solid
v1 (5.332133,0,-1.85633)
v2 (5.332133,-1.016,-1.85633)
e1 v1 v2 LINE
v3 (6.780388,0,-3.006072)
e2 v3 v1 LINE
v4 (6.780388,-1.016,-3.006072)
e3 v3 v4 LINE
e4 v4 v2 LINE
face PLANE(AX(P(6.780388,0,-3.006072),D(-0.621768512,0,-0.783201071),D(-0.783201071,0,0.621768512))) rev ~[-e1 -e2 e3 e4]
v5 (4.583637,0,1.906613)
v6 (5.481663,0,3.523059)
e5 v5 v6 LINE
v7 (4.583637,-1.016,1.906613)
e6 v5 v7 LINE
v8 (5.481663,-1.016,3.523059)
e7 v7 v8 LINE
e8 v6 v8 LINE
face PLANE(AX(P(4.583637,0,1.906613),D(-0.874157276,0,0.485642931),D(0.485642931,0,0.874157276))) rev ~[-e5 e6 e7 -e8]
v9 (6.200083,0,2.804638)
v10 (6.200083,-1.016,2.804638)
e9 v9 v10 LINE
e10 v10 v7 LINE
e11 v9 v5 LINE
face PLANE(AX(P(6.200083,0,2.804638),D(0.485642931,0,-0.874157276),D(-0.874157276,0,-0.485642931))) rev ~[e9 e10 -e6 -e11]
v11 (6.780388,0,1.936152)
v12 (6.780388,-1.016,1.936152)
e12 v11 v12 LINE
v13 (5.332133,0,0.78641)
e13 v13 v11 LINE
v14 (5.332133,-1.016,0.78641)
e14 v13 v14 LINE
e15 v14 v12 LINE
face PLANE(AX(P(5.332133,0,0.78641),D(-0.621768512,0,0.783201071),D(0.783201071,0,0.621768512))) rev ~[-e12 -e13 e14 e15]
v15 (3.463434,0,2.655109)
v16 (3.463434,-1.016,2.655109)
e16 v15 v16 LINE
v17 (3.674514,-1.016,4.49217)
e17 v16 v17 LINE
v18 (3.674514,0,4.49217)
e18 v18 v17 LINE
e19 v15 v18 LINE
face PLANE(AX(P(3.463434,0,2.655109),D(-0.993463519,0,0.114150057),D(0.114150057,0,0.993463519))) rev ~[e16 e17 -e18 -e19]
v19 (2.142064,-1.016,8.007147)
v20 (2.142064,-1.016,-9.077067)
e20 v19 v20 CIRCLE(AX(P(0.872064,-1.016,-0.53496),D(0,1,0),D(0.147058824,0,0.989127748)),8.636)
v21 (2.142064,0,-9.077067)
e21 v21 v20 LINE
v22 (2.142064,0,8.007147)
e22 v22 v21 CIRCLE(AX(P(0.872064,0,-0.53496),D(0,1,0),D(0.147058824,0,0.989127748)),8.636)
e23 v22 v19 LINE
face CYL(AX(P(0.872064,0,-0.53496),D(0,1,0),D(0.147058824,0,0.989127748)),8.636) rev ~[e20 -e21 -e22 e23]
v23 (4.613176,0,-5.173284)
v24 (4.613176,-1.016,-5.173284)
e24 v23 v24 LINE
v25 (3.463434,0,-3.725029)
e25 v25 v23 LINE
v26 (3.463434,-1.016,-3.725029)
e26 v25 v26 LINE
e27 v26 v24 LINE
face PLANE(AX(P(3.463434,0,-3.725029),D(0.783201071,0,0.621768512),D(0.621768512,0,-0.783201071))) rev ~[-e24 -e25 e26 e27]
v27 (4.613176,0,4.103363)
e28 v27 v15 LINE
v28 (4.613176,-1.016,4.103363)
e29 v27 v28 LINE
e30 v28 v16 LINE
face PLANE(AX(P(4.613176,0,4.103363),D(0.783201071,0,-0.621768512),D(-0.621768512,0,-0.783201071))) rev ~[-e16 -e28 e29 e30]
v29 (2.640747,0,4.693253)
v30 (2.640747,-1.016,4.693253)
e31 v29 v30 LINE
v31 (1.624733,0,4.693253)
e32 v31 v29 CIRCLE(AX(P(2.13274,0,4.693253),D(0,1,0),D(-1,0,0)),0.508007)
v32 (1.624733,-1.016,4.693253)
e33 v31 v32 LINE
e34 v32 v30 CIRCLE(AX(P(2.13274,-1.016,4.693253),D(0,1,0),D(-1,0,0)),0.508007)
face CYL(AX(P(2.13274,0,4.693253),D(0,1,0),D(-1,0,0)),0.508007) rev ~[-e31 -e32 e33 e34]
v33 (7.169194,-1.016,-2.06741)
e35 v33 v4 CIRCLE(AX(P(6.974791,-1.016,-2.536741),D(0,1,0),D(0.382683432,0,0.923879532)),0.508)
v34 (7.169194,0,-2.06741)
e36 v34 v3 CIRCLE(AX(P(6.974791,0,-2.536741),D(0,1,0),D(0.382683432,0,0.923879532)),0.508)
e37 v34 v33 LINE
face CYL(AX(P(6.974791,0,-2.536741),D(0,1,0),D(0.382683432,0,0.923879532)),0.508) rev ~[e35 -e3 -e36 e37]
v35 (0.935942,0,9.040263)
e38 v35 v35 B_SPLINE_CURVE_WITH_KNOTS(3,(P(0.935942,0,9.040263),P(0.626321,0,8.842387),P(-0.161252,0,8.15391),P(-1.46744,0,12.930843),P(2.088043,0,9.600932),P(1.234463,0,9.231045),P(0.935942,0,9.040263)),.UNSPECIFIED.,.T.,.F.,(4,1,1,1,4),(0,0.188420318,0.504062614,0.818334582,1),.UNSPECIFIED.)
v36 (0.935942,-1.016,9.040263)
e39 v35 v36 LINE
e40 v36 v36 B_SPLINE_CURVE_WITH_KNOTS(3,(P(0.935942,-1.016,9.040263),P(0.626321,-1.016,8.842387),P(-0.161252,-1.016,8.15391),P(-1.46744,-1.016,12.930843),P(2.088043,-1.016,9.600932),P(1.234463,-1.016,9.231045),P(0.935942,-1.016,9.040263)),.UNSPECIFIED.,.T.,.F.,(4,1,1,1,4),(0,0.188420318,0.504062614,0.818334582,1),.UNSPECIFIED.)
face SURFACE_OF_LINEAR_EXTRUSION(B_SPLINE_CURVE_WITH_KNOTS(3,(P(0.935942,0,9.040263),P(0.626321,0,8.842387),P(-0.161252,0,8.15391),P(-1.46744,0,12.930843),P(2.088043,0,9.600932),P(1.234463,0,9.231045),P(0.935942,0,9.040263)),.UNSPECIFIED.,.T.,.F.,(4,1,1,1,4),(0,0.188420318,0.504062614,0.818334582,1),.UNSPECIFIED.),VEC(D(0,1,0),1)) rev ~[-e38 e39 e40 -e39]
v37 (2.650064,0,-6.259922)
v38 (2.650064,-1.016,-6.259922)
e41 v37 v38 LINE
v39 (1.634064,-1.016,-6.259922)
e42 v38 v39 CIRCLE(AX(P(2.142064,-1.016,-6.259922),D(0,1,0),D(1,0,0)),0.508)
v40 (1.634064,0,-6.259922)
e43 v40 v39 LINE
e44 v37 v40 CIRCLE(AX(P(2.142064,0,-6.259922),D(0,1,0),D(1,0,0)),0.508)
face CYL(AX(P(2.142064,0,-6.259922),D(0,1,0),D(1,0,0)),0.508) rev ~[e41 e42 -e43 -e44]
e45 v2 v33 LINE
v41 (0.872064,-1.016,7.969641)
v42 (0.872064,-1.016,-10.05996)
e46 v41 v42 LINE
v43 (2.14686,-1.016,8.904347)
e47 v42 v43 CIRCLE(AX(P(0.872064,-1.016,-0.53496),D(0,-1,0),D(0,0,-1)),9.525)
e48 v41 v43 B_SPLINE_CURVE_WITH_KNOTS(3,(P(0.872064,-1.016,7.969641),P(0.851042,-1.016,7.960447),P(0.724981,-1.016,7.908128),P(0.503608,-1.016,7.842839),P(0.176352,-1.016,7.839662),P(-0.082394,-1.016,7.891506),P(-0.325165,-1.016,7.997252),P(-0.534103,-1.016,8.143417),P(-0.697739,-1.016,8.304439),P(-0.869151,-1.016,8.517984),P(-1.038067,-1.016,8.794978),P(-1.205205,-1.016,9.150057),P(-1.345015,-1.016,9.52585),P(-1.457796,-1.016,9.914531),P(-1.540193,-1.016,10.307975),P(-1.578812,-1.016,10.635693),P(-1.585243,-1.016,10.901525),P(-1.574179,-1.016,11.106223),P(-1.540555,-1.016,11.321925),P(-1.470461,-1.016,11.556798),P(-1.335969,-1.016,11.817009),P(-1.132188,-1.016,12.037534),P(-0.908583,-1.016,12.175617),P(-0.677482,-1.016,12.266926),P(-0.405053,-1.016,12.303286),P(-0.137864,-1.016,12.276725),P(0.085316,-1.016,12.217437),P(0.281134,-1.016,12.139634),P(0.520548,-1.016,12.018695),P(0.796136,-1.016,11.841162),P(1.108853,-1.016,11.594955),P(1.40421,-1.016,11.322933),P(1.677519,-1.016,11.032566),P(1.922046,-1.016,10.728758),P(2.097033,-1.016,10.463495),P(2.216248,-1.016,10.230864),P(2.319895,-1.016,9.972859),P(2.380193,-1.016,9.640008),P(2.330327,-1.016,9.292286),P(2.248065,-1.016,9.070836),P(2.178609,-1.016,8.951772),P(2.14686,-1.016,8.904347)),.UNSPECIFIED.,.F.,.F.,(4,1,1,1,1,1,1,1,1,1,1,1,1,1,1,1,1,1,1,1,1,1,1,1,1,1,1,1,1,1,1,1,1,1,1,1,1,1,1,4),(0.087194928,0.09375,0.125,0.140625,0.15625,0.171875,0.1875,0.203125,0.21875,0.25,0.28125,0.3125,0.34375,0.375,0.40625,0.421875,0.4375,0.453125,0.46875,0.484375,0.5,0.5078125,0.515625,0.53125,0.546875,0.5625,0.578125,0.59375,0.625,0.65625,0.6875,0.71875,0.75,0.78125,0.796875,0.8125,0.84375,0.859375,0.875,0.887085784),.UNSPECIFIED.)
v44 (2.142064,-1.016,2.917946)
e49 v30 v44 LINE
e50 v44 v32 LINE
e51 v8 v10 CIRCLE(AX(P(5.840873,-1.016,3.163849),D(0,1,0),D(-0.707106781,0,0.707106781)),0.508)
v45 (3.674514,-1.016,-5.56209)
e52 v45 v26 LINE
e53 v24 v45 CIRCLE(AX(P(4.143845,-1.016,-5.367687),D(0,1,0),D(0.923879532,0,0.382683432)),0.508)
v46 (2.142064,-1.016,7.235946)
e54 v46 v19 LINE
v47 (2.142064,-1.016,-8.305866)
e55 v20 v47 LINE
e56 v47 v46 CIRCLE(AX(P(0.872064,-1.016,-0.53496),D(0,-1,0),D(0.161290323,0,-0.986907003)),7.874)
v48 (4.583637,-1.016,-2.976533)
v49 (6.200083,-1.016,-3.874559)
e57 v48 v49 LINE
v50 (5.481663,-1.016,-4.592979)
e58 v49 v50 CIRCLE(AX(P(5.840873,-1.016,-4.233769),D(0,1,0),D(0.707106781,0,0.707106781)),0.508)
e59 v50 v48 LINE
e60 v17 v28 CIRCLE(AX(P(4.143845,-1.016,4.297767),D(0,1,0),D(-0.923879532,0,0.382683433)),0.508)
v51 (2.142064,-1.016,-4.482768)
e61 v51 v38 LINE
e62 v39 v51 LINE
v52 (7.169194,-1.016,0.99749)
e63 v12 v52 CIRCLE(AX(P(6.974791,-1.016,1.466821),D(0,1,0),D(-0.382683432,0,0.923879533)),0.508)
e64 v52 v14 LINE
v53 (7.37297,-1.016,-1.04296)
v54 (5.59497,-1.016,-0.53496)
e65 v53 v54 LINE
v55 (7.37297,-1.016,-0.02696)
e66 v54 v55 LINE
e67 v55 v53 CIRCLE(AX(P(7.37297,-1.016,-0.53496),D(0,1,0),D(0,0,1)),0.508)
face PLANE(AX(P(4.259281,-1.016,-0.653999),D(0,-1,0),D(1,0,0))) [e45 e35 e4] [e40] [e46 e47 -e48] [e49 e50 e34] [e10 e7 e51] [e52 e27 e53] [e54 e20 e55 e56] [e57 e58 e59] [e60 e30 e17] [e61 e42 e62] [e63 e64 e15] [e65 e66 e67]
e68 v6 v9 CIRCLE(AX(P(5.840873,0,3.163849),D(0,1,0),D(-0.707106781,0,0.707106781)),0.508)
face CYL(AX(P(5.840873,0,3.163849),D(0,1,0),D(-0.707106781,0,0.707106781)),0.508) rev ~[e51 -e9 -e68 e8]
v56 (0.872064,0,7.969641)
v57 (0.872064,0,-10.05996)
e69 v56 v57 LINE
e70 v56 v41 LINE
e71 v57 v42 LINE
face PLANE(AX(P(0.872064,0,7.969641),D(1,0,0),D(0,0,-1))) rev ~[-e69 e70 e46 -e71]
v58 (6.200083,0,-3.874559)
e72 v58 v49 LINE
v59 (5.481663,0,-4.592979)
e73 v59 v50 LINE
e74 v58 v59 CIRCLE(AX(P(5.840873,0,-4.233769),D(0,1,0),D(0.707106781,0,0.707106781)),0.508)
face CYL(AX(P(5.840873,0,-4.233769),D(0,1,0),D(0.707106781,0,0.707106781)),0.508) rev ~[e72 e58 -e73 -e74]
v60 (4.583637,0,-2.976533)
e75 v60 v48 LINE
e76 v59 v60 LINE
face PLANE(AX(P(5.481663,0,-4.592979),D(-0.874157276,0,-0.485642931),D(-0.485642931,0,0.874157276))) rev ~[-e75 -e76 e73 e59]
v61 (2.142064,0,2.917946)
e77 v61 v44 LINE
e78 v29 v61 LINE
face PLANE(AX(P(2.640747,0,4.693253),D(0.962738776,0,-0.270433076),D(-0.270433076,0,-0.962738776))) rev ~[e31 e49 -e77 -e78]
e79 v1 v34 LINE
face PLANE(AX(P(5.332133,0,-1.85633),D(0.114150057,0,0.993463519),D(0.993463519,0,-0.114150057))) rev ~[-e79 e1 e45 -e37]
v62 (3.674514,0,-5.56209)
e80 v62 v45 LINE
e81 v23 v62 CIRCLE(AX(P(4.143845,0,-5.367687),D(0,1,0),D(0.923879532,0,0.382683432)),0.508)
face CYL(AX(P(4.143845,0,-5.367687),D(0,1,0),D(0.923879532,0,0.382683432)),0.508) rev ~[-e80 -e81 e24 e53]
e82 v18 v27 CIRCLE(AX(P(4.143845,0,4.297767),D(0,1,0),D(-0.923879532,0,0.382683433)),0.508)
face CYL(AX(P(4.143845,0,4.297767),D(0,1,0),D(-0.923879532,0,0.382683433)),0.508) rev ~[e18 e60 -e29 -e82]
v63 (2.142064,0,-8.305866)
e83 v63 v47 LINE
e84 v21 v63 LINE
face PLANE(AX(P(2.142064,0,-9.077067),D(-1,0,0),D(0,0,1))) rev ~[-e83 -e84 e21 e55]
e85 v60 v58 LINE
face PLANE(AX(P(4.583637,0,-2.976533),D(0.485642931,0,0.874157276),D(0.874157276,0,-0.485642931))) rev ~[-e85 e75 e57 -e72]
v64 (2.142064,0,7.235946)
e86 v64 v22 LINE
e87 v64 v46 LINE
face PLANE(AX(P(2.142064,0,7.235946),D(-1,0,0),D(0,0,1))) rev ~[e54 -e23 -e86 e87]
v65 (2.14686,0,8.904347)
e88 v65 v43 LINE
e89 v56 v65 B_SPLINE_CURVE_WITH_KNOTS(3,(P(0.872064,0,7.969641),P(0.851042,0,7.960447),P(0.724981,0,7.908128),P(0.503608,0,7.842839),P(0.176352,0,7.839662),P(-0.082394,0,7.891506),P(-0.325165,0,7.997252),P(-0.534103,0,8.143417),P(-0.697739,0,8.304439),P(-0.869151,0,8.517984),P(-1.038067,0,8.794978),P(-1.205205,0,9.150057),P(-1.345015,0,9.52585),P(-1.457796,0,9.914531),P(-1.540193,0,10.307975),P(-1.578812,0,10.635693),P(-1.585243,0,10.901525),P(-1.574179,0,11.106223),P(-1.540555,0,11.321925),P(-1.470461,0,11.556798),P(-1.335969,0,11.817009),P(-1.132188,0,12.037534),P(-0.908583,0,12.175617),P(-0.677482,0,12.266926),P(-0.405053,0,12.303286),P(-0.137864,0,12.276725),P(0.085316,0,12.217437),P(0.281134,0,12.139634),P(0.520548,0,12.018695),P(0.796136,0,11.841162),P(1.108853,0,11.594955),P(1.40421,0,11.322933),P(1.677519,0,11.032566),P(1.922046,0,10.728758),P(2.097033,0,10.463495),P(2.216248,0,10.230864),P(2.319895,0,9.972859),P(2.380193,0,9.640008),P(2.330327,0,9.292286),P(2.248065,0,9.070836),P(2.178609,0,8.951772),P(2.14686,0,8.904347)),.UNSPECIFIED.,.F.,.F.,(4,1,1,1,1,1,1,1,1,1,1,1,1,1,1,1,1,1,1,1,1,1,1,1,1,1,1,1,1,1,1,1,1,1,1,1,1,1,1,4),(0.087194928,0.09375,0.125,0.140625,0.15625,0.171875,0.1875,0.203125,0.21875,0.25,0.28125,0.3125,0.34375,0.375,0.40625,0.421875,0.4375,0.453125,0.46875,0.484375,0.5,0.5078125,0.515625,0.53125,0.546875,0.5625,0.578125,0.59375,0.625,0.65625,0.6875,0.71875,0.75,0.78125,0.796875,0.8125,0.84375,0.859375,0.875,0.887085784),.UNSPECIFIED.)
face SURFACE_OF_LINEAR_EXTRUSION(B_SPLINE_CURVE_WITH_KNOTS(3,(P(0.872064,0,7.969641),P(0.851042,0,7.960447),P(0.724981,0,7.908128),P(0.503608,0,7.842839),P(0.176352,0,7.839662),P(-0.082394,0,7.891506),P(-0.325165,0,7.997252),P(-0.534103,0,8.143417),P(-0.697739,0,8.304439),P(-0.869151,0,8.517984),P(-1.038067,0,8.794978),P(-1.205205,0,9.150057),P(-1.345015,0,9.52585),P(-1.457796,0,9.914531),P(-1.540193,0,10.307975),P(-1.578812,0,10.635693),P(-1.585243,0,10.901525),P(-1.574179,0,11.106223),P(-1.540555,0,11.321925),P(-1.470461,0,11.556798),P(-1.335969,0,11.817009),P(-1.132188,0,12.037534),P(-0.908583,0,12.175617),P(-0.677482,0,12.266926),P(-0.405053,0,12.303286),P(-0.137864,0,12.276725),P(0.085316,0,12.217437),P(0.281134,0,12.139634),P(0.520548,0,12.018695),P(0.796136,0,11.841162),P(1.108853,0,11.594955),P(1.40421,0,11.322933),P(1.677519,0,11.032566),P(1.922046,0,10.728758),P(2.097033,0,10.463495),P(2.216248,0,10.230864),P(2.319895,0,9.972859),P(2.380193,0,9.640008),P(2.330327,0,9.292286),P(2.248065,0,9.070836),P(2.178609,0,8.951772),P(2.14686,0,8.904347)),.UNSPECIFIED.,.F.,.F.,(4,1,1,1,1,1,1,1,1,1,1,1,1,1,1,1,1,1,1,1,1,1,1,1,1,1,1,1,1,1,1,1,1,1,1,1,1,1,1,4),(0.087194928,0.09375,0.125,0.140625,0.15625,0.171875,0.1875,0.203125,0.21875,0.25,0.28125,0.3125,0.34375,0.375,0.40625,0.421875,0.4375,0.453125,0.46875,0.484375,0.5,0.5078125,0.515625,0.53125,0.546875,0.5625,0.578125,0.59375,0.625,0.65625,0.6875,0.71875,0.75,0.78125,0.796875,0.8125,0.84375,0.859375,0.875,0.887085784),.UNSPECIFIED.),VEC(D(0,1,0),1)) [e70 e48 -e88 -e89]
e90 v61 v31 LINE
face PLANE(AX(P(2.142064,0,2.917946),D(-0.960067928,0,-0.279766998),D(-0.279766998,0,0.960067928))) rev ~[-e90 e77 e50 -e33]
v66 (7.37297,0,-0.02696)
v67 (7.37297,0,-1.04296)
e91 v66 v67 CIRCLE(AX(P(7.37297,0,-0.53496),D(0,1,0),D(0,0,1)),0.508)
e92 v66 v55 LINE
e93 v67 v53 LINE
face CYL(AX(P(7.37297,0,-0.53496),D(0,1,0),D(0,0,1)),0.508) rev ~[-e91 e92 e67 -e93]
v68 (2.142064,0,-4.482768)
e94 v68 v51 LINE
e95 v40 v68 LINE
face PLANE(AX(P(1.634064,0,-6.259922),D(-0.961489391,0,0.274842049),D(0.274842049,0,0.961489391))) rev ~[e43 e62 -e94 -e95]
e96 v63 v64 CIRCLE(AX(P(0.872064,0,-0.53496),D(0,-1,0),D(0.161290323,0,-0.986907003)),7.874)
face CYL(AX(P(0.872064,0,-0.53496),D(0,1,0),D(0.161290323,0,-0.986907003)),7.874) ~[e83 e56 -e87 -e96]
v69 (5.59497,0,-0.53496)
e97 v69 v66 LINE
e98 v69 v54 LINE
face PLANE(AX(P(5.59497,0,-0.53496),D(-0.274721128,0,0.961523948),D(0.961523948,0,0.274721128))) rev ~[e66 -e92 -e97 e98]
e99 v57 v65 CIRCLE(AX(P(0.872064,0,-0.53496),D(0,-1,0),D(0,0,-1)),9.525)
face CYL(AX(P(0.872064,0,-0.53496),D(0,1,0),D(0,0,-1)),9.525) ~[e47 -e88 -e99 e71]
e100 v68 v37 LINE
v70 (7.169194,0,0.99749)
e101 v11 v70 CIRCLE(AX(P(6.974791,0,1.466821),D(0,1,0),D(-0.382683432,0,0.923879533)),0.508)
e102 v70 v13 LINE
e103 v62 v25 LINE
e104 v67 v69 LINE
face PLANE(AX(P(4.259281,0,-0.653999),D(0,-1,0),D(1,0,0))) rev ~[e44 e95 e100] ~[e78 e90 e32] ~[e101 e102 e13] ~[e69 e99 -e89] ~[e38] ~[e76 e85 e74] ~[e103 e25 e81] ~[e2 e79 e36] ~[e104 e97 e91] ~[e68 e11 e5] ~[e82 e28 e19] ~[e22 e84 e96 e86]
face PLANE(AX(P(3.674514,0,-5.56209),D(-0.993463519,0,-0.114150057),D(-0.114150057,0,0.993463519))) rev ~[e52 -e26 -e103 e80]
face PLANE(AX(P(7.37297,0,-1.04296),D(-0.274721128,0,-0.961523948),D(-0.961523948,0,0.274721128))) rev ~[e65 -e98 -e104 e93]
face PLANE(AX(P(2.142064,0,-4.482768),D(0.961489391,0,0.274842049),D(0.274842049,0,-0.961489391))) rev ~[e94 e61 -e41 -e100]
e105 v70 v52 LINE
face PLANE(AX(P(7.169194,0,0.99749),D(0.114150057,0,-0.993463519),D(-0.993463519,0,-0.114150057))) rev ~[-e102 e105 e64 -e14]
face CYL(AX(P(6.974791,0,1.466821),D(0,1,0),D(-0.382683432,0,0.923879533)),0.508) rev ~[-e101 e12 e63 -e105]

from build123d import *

# Parameters (mm, degrees)
F1_DEPTH = 1.016


# Not quite as in the source:
# - the dataset's text gives a spline's control points without its knots; the knots are read off the source's solid
# - a feature names something its author has since deleted; it is built from what else it names


with BuildPart() as f1:
    # F0 (on Front) → F1 (new body)
    with BuildSketch(Plane.XZ):
        with BuildLine():
            Line((0.8720639816, 7.9696412083), (0.8720639816, -10.0599602319))
            ThreePointArc((0.8720639816, -10.0599602319), (10.3756166469, -1.17379647), (2.1468595371, 8.9043470145))
            add(Edge.make_bspline(
                [(2.1468595371, 8.9043470145), (2.1375619429, 8.8904589251), (2.0865405168, 8.8173483885), (1.9460704833, 8.6552218776), (1.7420457163, 8.4951357663), (1.5810849761, 8.3938358775), (1.4761600351, 8.3297187682), (1.4351295268, 8.3042443679), (1.4146787791, 8.2911748332)],
                knots=[0.8870857839, 0.8870857839, 0.8870857839, 0.8870857839, 0.890625, 0.90625, 0.9375, 0.96875, 0.984375, 1, 1, 1, 1], degree=3))
            add(Edge.make_bspline(
                [(1.4146787791, 8.2911748332), (1.3942280315, 8.2781052984), (1.3534555492, 8.2513015595), (1.2501088251, 8.1821845952), (1.1037829859, 8.0867078461), (0.9512588202, 8.0042801492), (0.8720639816, 7.9696412083)],
                knots=[0, 0, 0, 0, 0.015625, 0.03125, 0.0625, 0.0871949279, 0.0871949279, 0.0871949279, 0.0871949279], degree=3))
        make_face()
        with BuildLine():
            Line((2.1420639816, -4.4827677338), (2.6500639816, -6.2599216028))
            ThreePointArc((2.6500639816, -6.2599216028), (2.1420639816, -6.7679216028), (1.6340639816, -6.2599216028))
            Line((1.6340639816, -6.2599216028), (2.1420639816, -4.4827677338))
        make_face(mode=Mode.SUBTRACT)
        with BuildLine():
            Line((3.4634338013, -3.7250291716), (4.6131757466, -5.1732837967))
            ThreePointArc((4.6131757466, -5.1732837967), (4.3382481277, -5.8370177829), (3.6745141416, -5.562090164))
            Line((3.6745141416, -5.562090164), (3.4634338013, -3.7250291716))
        make_face(mode=Mode.SUBTRACT)
        with BuildLine():
            Line((4.5836370443, -2.9765332945), (6.2000831461, -3.8745589066))
            ThreePointArc((6.2000831461, -3.8745589066), (6.2000831461, -4.5929793963), (5.4816626564, -4.5929793963))
            Line((5.4816626564, -4.5929793963), (4.5836370443, -2.9765332945))
        make_face(mode=Mode.SUBTRACT)
        with BuildLine():
            Line((5.3321329213, -1.8563300516), (7.1691939138, -2.0674103918))
            ThreePointArc((7.1691939138, -2.0674103918), (7.4441215326, -2.731144378), (6.7803875465, -3.0060719968))
            Line((6.7803875465, -3.0060719968), (5.3321329213, -1.8563300516))
        make_face(mode=Mode.SUBTRACT)
        with BuildLine():
            ThreePointArc((2.1420639816, 8.0071470023), (9.5080639816, -0.5349602319), (2.1420639816, -9.077067466))
            Line((2.1420639816, -9.077067466), (2.1420639816, -8.3058659706))
            ThreePointArc((2.1420639816, -8.3058659706), (8.7460639816, -0.5349602319), (2.1420639816, 7.2359455069))
            Line((2.1420639816, 7.2359455069), (2.1420639816, 8.0071470023))
        make_face(mode=Mode.SUBTRACT)
        with BuildLine():
            Line((5.5949697203, -0.5349602319), (7.3729697203, -0.0269602319))
            ThreePointArc((7.3729697203, -0.0269602319), (7.8809697203, -0.5349602319), (7.3729697203, -1.0429602319))
            Line((7.3729697203, -1.0429602319), (5.5949697203, -0.5349602319))
        make_face(mode=Mode.SUBTRACT)
        with BuildLine():
            Line((5.3321329213, 0.7864095879), (6.7803875465, 1.9361515331))
            ThreePointArc((6.7803875465, 1.9361515331), (7.4441215326, 1.6612239143), (7.1691939138, 0.9974899281))
            Line((7.1691939138, 0.9974899281), (5.3321329213, 0.7864095879))
        make_face(mode=Mode.SUBTRACT)
        with BuildLine():
            Line((2.1420639816, 2.9179455069), (1.6247334216, 4.6932531117))
            ThreePointArc((1.6247334216, 4.6932531117), (2.1327404272, 5.2012601173), (2.6407474328, 4.6932531117))
            Line((2.6407474328, 4.6932531117), (2.1420639816, 2.9179455069))
        make_face(mode=Mode.SUBTRACT)
        with BuildLine():
            Line((3.4634338013, 2.6551087078), (3.6745141416, 4.4921697003))
            ThreePointArc((3.6745141416, 4.4921697003), (4.3382481277, 4.7670973191), (4.6131757466, 4.103363333))
            Line((4.6131757466, 4.103363333), (3.4634338013, 2.6551087078))
        make_face(mode=Mode.SUBTRACT)
        with BuildLine():
            Line((4.5836370443, 1.9066128308), (5.4816626564, 3.5230589326))
            ThreePointArc((5.4816626564, 3.5230589326), (6.200083146, 3.5230589326), (6.2000831461, 2.8046384429))
            Line((6.2000831461, 2.8046384429), (4.5836370443, 1.9066128308))
        make_face(mode=Mode.SUBTRACT)
        with BuildLine():
            add(Edge.make_bspline(
                [(2.1468595371, 8.9043470145), (2.1375619429, 8.8904589251), (2.0865405168, 8.8173483885), (1.9460704833, 8.6552218776), (1.7420457163, 8.4951357663), (1.5810849761, 8.3938358775), (1.4761600351, 8.3297187682), (1.4351295268, 8.3042443679), (1.4146787791, 8.2911748332)],
                knots=[0.8870857839, 0.8870857839, 0.8870857839, 0.8870857839, 0.890625, 0.90625, 0.9375, 0.96875, 0.984375, 1, 1, 1, 1], degree=3))
            ThreePointArc((2.1468595371, 8.9043470145), (1.5109002197, 8.9685924334), (0.8720639816, 8.9900397681))
            Line((0.8720639816, 8.9900397681), (0.8720639816, 7.9696412083))
            add(Edge.make_bspline(
                [(1.4146787791, 8.2911748332), (1.3942280315, 8.2781052984), (1.3534555492, 8.2513015595), (1.2501088251, 8.1821845952), (1.1037829859, 8.0867078461), (0.9512588202, 8.0042801492), (0.8720639816, 7.9696412083)],
                knots=[0, 0, 0, 0, 0.015625, 0.03125, 0.0625, 0.0871949279, 0.0871949279, 0.0871949279, 0.0871949279], degree=3))
        make_face()
        with BuildLine():
            ThreePointArc((0.8720639816, 8.9900397681), (1.5109002197, 8.9685924334), (2.1468595371, 8.9043470145))
            add(Edge.make_bspline(
                [(0.8720639816, 7.9696412083), (0.8510423418, 7.960446577), (0.7249813726, 7.9081278301), (0.5036077396, 7.8428386533), (0.1763517707, 7.8396617002), (-0.0823939536, 7.8915061916), (-0.3251654939, 7.9972515694), (-0.5341027476, 8.1434171752), (-0.697739214, 8.3044391135), (-0.8691513012, 8.5179837512), (-1.0380674288, 8.7949781885), (-1.2052049627, 9.1500571037), (-1.3450151386, 9.5258501154), (-1.4577963792, 9.9145311538), (-1.5401925336, 10.3079754275), (-1.5788115991, 10.635693281), (-1.5852425405, 10.9015252067), (-1.5741785001, 11.1062228204), (-1.5405553236, 11.3219253664), (-1.4704609064, 11.5567984789), (-1.33596904, 11.8170093575), (-1.1321876014, 12.0375341588), (-0.908583488, 12.1756170372), (-0.6774819455, 12.2669258051), (-0.4050529119, 12.3032860953), (-0.1378640903, 12.2767253775), (0.0853156063, 12.2174366098), (0.2811335851, 12.13963355), (0.5205476797, 12.0186949927), (0.7961357942, 11.8411620626), (1.1088534794, 11.5949546296), (1.4042104843, 11.3229328113), (1.6775187355, 11.0325659825), (1.9220461866, 10.7287576582), (2.0970325204, 10.463495283), (2.216248269, 10.2308639089), (2.3198947054, 9.9728588144), (2.3801931706, 9.6400082363), (2.3303267053, 9.292286109), (2.248064936, 9.0708356121), (2.1786091427, 8.9517723325), (2.1468595371, 8.9043470145)],
                knots=[0.0871949279, 0.0871949279, 0.0871949279, 0.0871949279, 0.09375, 0.125, 0.140625, 0.15625, 0.171875, 0.1875, 0.203125, 0.21875, 0.25, 0.28125, 0.3125, 0.34375, 0.375, 0.40625, 0.421875, 0.4375, 0.453125, 0.46875, 0.484375, 0.5, 0.5078125, 0.515625, 0.53125, 0.546875, 0.5625, 0.578125, 0.59375, 0.625, 0.65625, 0.6875, 0.71875, 0.75, 0.78125, 0.796875, 0.8125, 0.84375, 0.859375, 0.875, 0.8870857839, 0.8870857839, 0.8870857839, 0.8870857839], degree=3))
            Line((0.8720639816, 7.9696412083), (0.8720639816, 8.9900397681))
        make_face()
        with BuildLine():
            add(Edge.make_bspline(
                [(0.9359423365, 9.0402629925), (0.6263213587, 8.8423866229), (-0.161252366, 8.1539099286), (-1.4674404396, 12.930843348), (2.0880429138, 9.6009320246), (1.23446335, 9.2310454608), (0.9359423365, 9.0402629925)],
                knots=[0, 0, 0, 0, 0.1884203182, 0.5040626137, 0.8183345821, 1, 1, 1, 1], degree=3))
        make_face(mode=Mode.SUBTRACT)
    extrude(amount=F1_DEPTH)


solid = f1.part
